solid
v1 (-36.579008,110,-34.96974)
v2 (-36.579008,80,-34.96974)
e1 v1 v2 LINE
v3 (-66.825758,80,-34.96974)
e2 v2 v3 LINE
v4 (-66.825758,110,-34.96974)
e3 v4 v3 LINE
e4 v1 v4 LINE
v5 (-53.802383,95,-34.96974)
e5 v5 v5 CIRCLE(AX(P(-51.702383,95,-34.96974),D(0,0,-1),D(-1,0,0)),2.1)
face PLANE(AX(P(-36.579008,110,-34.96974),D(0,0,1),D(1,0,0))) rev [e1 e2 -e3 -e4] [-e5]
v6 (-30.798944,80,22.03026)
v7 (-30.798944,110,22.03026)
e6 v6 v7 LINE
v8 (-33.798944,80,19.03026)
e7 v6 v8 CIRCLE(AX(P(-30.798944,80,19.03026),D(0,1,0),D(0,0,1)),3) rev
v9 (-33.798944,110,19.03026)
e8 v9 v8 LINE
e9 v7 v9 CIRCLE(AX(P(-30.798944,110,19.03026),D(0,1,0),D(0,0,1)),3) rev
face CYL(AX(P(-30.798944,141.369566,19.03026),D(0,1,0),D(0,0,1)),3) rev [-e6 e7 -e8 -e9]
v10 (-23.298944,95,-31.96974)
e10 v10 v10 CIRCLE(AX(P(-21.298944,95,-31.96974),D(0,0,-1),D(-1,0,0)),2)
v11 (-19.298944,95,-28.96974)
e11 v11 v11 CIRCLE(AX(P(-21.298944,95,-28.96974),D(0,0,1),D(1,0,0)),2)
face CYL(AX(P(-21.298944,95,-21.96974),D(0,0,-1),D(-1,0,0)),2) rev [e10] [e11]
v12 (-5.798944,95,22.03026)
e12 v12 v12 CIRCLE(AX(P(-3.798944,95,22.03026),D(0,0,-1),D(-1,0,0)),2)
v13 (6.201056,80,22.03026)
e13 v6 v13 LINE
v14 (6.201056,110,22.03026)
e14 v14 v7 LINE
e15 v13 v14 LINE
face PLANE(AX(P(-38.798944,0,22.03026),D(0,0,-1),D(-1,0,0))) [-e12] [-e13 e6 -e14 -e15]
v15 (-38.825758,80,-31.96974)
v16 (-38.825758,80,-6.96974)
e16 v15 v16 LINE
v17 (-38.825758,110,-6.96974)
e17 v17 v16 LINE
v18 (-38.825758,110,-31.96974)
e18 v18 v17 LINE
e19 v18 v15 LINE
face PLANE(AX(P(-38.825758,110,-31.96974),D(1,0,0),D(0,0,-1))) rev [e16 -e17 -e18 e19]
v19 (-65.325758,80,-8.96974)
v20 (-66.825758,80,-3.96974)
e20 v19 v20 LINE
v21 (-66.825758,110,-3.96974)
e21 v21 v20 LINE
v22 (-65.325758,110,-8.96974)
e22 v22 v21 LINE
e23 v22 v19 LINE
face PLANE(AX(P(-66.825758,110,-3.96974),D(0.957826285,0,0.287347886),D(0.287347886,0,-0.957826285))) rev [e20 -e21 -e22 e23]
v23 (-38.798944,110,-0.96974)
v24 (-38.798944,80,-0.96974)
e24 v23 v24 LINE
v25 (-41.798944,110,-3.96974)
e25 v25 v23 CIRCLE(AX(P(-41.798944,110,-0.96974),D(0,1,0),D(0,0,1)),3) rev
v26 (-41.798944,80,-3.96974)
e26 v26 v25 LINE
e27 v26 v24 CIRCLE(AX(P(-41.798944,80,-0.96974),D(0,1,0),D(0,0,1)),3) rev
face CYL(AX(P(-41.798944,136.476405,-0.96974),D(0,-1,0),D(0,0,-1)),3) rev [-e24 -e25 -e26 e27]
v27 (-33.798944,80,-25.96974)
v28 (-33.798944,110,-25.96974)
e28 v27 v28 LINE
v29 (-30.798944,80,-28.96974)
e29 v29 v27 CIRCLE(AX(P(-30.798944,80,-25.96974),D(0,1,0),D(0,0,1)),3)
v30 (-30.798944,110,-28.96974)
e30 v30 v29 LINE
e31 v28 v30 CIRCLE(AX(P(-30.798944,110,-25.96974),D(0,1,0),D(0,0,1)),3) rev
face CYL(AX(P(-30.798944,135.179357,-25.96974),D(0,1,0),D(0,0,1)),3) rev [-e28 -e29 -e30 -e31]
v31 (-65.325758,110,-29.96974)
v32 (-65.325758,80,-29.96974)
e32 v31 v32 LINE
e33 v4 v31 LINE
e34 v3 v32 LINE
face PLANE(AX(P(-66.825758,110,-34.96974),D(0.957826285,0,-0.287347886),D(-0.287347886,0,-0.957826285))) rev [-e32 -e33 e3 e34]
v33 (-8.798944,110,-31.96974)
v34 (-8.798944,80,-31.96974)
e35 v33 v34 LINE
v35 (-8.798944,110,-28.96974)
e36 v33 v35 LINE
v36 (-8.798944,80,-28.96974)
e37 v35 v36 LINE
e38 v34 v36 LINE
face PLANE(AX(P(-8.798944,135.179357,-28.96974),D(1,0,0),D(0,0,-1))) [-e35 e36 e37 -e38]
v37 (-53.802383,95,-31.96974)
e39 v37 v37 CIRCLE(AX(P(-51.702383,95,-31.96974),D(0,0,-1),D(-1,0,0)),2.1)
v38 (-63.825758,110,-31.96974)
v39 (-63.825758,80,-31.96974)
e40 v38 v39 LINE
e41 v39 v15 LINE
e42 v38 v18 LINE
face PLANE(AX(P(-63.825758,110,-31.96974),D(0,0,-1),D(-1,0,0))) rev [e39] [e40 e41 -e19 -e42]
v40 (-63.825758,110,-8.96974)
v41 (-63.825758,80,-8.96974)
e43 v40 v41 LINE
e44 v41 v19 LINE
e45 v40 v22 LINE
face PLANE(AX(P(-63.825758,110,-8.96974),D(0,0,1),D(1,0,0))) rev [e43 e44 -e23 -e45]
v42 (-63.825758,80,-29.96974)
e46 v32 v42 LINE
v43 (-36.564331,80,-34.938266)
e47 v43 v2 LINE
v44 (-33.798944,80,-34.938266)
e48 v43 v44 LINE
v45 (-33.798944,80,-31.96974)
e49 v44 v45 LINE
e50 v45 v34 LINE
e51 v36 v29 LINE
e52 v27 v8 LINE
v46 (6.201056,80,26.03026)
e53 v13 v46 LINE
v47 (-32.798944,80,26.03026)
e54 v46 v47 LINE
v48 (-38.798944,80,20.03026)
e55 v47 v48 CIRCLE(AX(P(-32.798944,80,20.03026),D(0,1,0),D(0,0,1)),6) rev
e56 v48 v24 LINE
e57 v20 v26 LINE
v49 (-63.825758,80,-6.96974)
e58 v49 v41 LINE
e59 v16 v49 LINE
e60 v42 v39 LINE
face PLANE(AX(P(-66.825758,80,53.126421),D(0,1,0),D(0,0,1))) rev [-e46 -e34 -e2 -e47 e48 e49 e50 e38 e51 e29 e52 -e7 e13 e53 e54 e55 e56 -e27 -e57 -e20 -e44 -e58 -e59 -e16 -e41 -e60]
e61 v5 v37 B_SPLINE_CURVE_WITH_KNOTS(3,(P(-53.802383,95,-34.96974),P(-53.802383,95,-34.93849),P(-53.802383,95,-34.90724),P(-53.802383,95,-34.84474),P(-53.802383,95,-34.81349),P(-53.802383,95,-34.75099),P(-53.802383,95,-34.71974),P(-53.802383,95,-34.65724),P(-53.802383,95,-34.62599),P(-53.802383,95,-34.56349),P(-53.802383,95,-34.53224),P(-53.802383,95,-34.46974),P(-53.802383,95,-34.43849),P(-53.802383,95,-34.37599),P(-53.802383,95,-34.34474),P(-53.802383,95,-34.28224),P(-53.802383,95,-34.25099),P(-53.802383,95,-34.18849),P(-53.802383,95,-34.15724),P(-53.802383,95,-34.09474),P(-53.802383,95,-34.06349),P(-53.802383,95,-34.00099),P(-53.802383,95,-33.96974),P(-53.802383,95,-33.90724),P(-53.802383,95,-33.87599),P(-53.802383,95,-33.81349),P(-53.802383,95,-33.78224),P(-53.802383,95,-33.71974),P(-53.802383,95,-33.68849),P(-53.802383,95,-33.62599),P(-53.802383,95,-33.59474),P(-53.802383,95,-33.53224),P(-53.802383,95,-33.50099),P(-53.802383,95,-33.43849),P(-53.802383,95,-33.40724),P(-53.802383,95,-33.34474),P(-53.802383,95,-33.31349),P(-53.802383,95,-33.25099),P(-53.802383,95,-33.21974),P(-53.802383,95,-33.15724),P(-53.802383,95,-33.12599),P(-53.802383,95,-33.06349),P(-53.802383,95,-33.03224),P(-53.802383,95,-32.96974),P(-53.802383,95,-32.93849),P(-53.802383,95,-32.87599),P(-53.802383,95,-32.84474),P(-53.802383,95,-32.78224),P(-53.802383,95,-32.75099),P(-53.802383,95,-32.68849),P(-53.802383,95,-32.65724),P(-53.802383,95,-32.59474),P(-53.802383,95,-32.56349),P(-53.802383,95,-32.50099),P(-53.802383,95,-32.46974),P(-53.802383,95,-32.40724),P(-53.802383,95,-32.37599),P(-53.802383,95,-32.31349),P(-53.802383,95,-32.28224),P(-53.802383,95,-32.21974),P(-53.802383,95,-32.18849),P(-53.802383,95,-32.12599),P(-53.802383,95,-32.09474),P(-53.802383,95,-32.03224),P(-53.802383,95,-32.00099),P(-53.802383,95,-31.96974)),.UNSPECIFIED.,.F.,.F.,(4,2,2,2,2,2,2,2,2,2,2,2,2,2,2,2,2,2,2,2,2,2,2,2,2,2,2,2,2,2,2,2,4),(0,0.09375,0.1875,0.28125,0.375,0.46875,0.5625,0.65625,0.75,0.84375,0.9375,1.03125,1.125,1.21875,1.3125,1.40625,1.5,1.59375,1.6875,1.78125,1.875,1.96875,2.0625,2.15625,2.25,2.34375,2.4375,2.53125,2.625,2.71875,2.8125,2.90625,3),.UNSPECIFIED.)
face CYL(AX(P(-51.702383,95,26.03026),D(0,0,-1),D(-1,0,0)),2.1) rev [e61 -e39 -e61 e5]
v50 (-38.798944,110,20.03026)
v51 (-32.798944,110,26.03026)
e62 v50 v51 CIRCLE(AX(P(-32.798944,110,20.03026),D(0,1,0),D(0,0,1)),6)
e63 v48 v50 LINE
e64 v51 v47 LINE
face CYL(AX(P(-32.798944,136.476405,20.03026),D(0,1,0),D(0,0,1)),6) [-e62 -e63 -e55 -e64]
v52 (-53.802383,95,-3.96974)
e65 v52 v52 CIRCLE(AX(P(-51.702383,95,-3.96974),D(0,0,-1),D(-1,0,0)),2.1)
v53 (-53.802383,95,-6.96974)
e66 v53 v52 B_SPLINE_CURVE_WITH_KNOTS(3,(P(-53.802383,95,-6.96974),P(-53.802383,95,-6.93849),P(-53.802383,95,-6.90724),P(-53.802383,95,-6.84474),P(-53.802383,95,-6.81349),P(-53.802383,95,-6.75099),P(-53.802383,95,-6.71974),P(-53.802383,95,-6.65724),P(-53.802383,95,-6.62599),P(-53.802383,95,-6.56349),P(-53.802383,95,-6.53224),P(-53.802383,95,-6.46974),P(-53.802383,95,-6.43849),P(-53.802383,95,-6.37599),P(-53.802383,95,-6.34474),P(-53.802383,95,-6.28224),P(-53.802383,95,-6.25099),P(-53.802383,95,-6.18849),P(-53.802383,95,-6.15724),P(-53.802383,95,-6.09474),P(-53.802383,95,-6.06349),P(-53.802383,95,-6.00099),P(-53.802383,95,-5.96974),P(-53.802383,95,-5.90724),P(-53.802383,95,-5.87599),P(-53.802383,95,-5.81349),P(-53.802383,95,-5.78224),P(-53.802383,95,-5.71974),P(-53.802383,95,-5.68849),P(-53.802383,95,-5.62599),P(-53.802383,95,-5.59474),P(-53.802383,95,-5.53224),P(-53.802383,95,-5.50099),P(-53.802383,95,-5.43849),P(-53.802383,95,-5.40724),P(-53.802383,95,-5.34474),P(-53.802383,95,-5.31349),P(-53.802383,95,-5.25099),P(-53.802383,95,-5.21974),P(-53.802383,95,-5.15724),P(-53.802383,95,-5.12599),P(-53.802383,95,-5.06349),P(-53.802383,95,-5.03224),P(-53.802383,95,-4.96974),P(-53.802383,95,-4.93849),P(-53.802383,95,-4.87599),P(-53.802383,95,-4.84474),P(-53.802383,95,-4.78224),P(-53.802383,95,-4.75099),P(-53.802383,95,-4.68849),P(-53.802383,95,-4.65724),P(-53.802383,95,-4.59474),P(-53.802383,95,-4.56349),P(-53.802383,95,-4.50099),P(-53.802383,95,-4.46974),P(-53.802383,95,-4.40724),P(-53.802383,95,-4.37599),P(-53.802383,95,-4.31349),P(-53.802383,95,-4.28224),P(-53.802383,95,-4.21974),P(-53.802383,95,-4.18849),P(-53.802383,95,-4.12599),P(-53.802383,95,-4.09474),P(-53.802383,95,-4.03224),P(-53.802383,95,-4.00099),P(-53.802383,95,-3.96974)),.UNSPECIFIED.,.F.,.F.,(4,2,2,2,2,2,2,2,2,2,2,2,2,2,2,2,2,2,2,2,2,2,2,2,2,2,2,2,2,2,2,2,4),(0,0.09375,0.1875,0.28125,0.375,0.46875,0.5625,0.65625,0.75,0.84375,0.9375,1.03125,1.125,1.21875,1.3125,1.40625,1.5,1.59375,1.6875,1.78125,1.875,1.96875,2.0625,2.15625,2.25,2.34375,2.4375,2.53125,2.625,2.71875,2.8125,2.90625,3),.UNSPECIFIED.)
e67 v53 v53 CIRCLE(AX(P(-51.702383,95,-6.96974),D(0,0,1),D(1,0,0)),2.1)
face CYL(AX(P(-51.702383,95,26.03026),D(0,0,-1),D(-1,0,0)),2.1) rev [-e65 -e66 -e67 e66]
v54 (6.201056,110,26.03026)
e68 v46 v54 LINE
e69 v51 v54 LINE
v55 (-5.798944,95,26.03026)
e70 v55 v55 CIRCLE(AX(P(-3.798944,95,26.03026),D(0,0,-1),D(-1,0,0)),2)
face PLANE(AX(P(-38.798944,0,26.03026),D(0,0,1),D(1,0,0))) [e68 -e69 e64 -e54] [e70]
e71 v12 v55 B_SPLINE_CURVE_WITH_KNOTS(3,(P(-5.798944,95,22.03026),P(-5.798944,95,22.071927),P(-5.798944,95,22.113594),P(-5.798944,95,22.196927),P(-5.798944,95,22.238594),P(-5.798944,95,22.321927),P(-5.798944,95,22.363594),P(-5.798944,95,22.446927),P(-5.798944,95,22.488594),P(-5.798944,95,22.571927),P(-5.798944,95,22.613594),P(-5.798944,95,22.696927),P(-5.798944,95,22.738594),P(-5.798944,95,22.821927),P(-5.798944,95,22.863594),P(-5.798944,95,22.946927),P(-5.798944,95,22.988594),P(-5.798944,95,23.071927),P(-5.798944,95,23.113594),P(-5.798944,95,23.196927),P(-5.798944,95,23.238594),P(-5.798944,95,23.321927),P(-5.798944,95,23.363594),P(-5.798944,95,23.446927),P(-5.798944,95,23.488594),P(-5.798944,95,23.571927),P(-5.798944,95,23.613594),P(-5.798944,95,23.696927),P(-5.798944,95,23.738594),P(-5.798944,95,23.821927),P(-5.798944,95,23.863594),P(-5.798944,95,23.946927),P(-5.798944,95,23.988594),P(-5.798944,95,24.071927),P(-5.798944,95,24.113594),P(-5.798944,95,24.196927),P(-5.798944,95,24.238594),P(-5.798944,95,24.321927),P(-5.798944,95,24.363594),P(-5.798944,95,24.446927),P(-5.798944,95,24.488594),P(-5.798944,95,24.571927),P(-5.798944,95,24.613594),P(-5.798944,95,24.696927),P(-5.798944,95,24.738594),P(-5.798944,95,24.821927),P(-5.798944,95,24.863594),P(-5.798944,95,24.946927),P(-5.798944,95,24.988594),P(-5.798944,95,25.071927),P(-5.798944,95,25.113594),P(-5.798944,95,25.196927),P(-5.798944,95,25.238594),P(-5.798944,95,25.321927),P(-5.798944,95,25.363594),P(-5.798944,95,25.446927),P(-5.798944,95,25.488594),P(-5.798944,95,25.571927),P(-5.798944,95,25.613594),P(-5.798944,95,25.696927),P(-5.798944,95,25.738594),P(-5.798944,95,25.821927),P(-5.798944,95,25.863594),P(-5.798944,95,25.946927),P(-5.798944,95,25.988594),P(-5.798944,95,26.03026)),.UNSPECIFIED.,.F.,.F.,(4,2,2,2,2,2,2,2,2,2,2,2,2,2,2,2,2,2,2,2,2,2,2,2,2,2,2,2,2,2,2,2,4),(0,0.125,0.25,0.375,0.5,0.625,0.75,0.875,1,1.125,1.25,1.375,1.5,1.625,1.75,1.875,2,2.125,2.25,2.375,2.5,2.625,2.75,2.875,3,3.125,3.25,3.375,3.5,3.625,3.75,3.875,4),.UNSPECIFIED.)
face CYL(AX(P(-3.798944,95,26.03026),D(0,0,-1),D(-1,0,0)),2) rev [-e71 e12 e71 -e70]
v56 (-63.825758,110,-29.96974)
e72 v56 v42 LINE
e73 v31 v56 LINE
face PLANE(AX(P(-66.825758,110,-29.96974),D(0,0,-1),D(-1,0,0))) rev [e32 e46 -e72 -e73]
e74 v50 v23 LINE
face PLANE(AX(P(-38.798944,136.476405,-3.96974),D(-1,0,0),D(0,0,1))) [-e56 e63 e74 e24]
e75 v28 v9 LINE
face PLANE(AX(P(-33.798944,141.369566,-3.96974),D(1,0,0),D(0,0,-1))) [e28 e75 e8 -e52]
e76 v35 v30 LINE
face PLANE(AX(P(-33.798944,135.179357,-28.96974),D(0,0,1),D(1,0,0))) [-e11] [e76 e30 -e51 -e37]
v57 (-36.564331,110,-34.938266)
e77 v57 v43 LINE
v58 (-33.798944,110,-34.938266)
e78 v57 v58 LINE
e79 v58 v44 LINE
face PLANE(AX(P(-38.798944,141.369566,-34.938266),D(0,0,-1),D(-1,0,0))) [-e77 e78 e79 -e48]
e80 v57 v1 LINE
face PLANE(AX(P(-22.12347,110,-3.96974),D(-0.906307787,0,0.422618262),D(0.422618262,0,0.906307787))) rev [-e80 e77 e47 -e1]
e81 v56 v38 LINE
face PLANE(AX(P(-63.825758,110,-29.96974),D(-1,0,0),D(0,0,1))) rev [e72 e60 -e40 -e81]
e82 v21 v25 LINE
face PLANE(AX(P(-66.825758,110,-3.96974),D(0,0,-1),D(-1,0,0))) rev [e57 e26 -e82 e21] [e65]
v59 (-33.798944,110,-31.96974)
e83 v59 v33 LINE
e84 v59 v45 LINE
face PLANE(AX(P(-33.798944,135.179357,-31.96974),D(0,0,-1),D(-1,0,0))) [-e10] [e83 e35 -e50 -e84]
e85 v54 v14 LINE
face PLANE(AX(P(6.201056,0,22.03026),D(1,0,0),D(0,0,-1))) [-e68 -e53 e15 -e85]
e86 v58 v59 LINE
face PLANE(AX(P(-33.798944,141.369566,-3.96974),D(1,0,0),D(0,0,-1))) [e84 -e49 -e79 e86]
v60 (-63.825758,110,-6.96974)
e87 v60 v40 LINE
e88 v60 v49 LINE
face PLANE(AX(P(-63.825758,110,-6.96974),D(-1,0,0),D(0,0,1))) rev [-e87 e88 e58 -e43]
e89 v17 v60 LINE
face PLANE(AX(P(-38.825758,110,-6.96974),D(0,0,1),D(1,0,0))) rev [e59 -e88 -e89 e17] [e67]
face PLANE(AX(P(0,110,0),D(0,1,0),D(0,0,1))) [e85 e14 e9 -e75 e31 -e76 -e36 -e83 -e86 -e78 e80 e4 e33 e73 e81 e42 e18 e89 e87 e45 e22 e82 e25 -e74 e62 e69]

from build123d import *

# Parameters (mm, degrees)
EXTRUDE_1_DEPTH      = 110
CUT_EXTRUDE_4_DEPTH  = 134.373777696
SKETCH_7_W           = 16.60831278
SKETCH_7_H           = 38.473598513
CUT_EXTRUDE_14_DEPTH = 134.373777696
SKETCH_8_W           = 5
SKETCH_8_H           = 30.968526609
EXTRUDE_2_DEPTH      = 110
SKETCH_10_W          = 5
SKETCH_10_H          = 26
EXTRUDE_4_DEPTH      = 110
SKETCH_16_W          = 45
SKETCH_16_H          = 4
EXTRUDE_7_DEPTH      = 110
FILLET_4_R           = 3
FILLET_5_R           = 6
SKETCH_18_W          = 113.67218818
SKETCH_18_H          = 61.649849458
CUT_EXTRUDE_18_DEPTH = 137.586229955
SKETCH_19_R          = 2.1
SKETCH_19_R_2        = 2
CUT_EXTRUDE_19_DEPTH = 143.431323365
SKETCH_22_W          = 25
SKETCH_22_H          = 3
EXTRUDE_10_DEPTH     = 30
FILLET_7_R           = 3
SKETCH_23_R          = 2
CUT_EXTRUDE_24_DEPTH = 10
SKETCH_24_W          = 79.129869038
SKETCH_24_H          = 20.357001259
CUT_EXTRUDE_25_DEPTH = 143.431323365


# Read off the part's stored shape, not the designer's step: Бобышка-Вытянуть1
with BuildPart() as part:
    # Бобышка-Вытянуть1 outline → Бобышка-Вытянуть1 (new body)
    with BuildSketch(Plane(origin=(0, 0, 0), x_dir=(1, 0, 0), z_dir=(0, 1, 0))):
        Polygon((-36.579007505, 34.969739794), (-66.825757576, 34.969739794), (-66.825757576, 29.969739794), (-63.825757576, 29.969739794), (-63.825757576, 31.969739794), (-38.825757576, 31.969739794), (-38.825757576, 6.969739794), (-63.825757576, 6.969739794), (-63.825757576, 8.969739794), (-66.825757576, 8.969739794), (-66.825757576, 3.969739794), (-22.123470102, 3.969739794), align=None)
    extrude(amount=EXTRUDE_1_DEPTH)

    # Эскиз3 → Вырез-Вытянуть4 (cut, through all)
    with BuildSketch(Plane.XZ):
        Polygon((-66.825757576, -3.969739794), (-65.325757576, -8.969739794), (-66.825757576, -8.969739794), align=None)
        Polygon((-66.825757576, -29.969739794), (-66.825757576, -34.969739794), (-65.325757576, -29.969739794), align=None)
    extrude(amount=-CUT_EXTRUDE_4_DEPTH, mode=Mode.SUBTRACT)

    # Эскиз7 → Вырез-Вытянуть14 (cut, through all)
    with BuildSketch(Plane(origin=(0, 0, 0), x_dir=(-1, 0, 0), z_dir=(0, -1, 0))):
        with Locations((27.703474463, 20.539743139)):
            Rectangle(SKETCH_7_W, SKETCH_7_H)
    extrude(amount=-CUT_EXTRUDE_14_DEPTH, mode=Mode.SUBTRACT)

    # Эскиз8 → Бобышка-Вытянуть2 (add)
    with BuildSketch(Plane(origin=(0, 0, 0), x_dir=(-1, 0, 0), z_dir=(0, -1, 0))):
        with Locations((36.298943925, 19.454003098)):
            Rectangle(SKETCH_8_W, SKETCH_8_H)
    extrude(amount=-EXTRUDE_2_DEPTH)

    # Эскиз10 → Бобышка-Вытянуть4 (add)
    with BuildSketch(Plane.XZ):
        with Locations((-36.298943925, 9.030260206)):
            Rectangle(SKETCH_10_W, SKETCH_10_H)
    extrude(amount=-EXTRUDE_4_DEPTH)

    # Эскиз16 → Бобышка-Вытянуть7 (add, through all)
    with BuildSketch(Plane(origin=(0, 110, 0), x_dir=(1, 0, 0), z_dir=(0, 1, 0))):
        with Locations((-16.298943925, -24.030260206)):
            Rectangle(SKETCH_16_W, SKETCH_16_H)
    extrude(amount=-EXTRUDE_7_DEPTH)

    # Скругление4
    fillet_4_edges = [part.edges().sort_by_distance(p)[0] for p in [
        (-38.798943925, 55, -3.969739794),
        (-33.798943925, 55, 22.030260206),
    ]]
    fillet(fillet_4_edges, radius=FILLET_4_R)

    # Скругление5
    fillet_5_edges = [part.edges().sort_by_distance(p)[0] for p in [
        (-38.798943925, 55, 26.030260206),
    ]]
    fillet(fillet_5_edges, radius=FILLET_5_R)

    # Эскиз18 → Вырез-Вытянуть18 (cut, through all)
    with BuildSketch(Plane(origin=(6.201056075, 0, 0), x_dir=(0, 0, -1), z_dir=(1, 0, 0))):
        with Locations((3.709673157, 49.175075271)):
            Rectangle(SKETCH_18_W, SKETCH_18_H)
    extrude(amount=-CUT_EXTRUDE_18_DEPTH, mode=Mode.SUBTRACT)


with BuildPart() as cut_extrude_18_piece_1:
    # of the separate pieces the step leaves, piece 1, a body of its own (cut_extrude_18_pieces)
    add(part.part.solids().sort_by_distance((-38.798943925, 110, 20.030260206))[0])

    # Эскиз19 → Вырез-Вытянуть19 (cut, through all)
    with BuildSketch(Plane(origin=(0, 0, -34.969739794), x_dir=(-1, 0, 0), z_dir=(0, 0, -1))):
        with Locations((51.70238254, 95)):
            Circle(SKETCH_19_R)
        with Locations((3.798943925, 95)):
            Circle(SKETCH_19_R_2)
    extrude(amount=-CUT_EXTRUDE_19_DEPTH, mode=Mode.SUBTRACT)

    # Эскиз22 → Бобышка-Вытянуть10 (add)
    with BuildSketch(Plane.XZ.offset(-80)):
        with Locations((-21.298943925, -30.469739794)):
            Rectangle(SKETCH_22_W, SKETCH_22_H)
    extrude(amount=-EXTRUDE_10_DEPTH)

    # Скругление7
    fillet_7_edges = [cut_extrude_18_piece_1.edges().sort_by_distance(p)[0] for p in [
        (-33.798943925, 95, -28.969739794),
    ]]
    fillet(fillet_7_edges, radius=FILLET_7_R)

    # Эскиз23 → Вырез-Вытянуть24 (cut)
    with BuildSketch(Plane(origin=(0, 0, -31.969739794), x_dir=(-1, 0, 0), z_dir=(0, 0, -1))):
        with Locations((21.298943925, 95)):
            Circle(SKETCH_23_R)
    extrude(amount=-CUT_EXTRUDE_24_DEPTH, mode=Mode.SUBTRACT)


with BuildPart() as cut_extrude_18_piece_2:
    # of the separate pieces the step leaves, piece 2, a body of its own (cut_extrude_18_pieces)
    add(part.part.solids().sort_by_distance((-38.798943925, 18.350150542, -0.969739794))[0])

    # Эскиз24 → Вырез-Вытянуть25 (cut, through all)
    with BuildSketch(Plane(origin=(0, 0, -34.969739794), x_dir=(-1, 0, 0), z_dir=(0, 0, -1))):
        with Locations((27.260823057, 8.171649913)):
            Rectangle(SKETCH_24_W, SKETCH_24_H)
    extrude(amount=-CUT_EXTRUDE_25_DEPTH, mode=Mode.SUBTRACT)


solid = cut_extrude_18_piece_1.part
